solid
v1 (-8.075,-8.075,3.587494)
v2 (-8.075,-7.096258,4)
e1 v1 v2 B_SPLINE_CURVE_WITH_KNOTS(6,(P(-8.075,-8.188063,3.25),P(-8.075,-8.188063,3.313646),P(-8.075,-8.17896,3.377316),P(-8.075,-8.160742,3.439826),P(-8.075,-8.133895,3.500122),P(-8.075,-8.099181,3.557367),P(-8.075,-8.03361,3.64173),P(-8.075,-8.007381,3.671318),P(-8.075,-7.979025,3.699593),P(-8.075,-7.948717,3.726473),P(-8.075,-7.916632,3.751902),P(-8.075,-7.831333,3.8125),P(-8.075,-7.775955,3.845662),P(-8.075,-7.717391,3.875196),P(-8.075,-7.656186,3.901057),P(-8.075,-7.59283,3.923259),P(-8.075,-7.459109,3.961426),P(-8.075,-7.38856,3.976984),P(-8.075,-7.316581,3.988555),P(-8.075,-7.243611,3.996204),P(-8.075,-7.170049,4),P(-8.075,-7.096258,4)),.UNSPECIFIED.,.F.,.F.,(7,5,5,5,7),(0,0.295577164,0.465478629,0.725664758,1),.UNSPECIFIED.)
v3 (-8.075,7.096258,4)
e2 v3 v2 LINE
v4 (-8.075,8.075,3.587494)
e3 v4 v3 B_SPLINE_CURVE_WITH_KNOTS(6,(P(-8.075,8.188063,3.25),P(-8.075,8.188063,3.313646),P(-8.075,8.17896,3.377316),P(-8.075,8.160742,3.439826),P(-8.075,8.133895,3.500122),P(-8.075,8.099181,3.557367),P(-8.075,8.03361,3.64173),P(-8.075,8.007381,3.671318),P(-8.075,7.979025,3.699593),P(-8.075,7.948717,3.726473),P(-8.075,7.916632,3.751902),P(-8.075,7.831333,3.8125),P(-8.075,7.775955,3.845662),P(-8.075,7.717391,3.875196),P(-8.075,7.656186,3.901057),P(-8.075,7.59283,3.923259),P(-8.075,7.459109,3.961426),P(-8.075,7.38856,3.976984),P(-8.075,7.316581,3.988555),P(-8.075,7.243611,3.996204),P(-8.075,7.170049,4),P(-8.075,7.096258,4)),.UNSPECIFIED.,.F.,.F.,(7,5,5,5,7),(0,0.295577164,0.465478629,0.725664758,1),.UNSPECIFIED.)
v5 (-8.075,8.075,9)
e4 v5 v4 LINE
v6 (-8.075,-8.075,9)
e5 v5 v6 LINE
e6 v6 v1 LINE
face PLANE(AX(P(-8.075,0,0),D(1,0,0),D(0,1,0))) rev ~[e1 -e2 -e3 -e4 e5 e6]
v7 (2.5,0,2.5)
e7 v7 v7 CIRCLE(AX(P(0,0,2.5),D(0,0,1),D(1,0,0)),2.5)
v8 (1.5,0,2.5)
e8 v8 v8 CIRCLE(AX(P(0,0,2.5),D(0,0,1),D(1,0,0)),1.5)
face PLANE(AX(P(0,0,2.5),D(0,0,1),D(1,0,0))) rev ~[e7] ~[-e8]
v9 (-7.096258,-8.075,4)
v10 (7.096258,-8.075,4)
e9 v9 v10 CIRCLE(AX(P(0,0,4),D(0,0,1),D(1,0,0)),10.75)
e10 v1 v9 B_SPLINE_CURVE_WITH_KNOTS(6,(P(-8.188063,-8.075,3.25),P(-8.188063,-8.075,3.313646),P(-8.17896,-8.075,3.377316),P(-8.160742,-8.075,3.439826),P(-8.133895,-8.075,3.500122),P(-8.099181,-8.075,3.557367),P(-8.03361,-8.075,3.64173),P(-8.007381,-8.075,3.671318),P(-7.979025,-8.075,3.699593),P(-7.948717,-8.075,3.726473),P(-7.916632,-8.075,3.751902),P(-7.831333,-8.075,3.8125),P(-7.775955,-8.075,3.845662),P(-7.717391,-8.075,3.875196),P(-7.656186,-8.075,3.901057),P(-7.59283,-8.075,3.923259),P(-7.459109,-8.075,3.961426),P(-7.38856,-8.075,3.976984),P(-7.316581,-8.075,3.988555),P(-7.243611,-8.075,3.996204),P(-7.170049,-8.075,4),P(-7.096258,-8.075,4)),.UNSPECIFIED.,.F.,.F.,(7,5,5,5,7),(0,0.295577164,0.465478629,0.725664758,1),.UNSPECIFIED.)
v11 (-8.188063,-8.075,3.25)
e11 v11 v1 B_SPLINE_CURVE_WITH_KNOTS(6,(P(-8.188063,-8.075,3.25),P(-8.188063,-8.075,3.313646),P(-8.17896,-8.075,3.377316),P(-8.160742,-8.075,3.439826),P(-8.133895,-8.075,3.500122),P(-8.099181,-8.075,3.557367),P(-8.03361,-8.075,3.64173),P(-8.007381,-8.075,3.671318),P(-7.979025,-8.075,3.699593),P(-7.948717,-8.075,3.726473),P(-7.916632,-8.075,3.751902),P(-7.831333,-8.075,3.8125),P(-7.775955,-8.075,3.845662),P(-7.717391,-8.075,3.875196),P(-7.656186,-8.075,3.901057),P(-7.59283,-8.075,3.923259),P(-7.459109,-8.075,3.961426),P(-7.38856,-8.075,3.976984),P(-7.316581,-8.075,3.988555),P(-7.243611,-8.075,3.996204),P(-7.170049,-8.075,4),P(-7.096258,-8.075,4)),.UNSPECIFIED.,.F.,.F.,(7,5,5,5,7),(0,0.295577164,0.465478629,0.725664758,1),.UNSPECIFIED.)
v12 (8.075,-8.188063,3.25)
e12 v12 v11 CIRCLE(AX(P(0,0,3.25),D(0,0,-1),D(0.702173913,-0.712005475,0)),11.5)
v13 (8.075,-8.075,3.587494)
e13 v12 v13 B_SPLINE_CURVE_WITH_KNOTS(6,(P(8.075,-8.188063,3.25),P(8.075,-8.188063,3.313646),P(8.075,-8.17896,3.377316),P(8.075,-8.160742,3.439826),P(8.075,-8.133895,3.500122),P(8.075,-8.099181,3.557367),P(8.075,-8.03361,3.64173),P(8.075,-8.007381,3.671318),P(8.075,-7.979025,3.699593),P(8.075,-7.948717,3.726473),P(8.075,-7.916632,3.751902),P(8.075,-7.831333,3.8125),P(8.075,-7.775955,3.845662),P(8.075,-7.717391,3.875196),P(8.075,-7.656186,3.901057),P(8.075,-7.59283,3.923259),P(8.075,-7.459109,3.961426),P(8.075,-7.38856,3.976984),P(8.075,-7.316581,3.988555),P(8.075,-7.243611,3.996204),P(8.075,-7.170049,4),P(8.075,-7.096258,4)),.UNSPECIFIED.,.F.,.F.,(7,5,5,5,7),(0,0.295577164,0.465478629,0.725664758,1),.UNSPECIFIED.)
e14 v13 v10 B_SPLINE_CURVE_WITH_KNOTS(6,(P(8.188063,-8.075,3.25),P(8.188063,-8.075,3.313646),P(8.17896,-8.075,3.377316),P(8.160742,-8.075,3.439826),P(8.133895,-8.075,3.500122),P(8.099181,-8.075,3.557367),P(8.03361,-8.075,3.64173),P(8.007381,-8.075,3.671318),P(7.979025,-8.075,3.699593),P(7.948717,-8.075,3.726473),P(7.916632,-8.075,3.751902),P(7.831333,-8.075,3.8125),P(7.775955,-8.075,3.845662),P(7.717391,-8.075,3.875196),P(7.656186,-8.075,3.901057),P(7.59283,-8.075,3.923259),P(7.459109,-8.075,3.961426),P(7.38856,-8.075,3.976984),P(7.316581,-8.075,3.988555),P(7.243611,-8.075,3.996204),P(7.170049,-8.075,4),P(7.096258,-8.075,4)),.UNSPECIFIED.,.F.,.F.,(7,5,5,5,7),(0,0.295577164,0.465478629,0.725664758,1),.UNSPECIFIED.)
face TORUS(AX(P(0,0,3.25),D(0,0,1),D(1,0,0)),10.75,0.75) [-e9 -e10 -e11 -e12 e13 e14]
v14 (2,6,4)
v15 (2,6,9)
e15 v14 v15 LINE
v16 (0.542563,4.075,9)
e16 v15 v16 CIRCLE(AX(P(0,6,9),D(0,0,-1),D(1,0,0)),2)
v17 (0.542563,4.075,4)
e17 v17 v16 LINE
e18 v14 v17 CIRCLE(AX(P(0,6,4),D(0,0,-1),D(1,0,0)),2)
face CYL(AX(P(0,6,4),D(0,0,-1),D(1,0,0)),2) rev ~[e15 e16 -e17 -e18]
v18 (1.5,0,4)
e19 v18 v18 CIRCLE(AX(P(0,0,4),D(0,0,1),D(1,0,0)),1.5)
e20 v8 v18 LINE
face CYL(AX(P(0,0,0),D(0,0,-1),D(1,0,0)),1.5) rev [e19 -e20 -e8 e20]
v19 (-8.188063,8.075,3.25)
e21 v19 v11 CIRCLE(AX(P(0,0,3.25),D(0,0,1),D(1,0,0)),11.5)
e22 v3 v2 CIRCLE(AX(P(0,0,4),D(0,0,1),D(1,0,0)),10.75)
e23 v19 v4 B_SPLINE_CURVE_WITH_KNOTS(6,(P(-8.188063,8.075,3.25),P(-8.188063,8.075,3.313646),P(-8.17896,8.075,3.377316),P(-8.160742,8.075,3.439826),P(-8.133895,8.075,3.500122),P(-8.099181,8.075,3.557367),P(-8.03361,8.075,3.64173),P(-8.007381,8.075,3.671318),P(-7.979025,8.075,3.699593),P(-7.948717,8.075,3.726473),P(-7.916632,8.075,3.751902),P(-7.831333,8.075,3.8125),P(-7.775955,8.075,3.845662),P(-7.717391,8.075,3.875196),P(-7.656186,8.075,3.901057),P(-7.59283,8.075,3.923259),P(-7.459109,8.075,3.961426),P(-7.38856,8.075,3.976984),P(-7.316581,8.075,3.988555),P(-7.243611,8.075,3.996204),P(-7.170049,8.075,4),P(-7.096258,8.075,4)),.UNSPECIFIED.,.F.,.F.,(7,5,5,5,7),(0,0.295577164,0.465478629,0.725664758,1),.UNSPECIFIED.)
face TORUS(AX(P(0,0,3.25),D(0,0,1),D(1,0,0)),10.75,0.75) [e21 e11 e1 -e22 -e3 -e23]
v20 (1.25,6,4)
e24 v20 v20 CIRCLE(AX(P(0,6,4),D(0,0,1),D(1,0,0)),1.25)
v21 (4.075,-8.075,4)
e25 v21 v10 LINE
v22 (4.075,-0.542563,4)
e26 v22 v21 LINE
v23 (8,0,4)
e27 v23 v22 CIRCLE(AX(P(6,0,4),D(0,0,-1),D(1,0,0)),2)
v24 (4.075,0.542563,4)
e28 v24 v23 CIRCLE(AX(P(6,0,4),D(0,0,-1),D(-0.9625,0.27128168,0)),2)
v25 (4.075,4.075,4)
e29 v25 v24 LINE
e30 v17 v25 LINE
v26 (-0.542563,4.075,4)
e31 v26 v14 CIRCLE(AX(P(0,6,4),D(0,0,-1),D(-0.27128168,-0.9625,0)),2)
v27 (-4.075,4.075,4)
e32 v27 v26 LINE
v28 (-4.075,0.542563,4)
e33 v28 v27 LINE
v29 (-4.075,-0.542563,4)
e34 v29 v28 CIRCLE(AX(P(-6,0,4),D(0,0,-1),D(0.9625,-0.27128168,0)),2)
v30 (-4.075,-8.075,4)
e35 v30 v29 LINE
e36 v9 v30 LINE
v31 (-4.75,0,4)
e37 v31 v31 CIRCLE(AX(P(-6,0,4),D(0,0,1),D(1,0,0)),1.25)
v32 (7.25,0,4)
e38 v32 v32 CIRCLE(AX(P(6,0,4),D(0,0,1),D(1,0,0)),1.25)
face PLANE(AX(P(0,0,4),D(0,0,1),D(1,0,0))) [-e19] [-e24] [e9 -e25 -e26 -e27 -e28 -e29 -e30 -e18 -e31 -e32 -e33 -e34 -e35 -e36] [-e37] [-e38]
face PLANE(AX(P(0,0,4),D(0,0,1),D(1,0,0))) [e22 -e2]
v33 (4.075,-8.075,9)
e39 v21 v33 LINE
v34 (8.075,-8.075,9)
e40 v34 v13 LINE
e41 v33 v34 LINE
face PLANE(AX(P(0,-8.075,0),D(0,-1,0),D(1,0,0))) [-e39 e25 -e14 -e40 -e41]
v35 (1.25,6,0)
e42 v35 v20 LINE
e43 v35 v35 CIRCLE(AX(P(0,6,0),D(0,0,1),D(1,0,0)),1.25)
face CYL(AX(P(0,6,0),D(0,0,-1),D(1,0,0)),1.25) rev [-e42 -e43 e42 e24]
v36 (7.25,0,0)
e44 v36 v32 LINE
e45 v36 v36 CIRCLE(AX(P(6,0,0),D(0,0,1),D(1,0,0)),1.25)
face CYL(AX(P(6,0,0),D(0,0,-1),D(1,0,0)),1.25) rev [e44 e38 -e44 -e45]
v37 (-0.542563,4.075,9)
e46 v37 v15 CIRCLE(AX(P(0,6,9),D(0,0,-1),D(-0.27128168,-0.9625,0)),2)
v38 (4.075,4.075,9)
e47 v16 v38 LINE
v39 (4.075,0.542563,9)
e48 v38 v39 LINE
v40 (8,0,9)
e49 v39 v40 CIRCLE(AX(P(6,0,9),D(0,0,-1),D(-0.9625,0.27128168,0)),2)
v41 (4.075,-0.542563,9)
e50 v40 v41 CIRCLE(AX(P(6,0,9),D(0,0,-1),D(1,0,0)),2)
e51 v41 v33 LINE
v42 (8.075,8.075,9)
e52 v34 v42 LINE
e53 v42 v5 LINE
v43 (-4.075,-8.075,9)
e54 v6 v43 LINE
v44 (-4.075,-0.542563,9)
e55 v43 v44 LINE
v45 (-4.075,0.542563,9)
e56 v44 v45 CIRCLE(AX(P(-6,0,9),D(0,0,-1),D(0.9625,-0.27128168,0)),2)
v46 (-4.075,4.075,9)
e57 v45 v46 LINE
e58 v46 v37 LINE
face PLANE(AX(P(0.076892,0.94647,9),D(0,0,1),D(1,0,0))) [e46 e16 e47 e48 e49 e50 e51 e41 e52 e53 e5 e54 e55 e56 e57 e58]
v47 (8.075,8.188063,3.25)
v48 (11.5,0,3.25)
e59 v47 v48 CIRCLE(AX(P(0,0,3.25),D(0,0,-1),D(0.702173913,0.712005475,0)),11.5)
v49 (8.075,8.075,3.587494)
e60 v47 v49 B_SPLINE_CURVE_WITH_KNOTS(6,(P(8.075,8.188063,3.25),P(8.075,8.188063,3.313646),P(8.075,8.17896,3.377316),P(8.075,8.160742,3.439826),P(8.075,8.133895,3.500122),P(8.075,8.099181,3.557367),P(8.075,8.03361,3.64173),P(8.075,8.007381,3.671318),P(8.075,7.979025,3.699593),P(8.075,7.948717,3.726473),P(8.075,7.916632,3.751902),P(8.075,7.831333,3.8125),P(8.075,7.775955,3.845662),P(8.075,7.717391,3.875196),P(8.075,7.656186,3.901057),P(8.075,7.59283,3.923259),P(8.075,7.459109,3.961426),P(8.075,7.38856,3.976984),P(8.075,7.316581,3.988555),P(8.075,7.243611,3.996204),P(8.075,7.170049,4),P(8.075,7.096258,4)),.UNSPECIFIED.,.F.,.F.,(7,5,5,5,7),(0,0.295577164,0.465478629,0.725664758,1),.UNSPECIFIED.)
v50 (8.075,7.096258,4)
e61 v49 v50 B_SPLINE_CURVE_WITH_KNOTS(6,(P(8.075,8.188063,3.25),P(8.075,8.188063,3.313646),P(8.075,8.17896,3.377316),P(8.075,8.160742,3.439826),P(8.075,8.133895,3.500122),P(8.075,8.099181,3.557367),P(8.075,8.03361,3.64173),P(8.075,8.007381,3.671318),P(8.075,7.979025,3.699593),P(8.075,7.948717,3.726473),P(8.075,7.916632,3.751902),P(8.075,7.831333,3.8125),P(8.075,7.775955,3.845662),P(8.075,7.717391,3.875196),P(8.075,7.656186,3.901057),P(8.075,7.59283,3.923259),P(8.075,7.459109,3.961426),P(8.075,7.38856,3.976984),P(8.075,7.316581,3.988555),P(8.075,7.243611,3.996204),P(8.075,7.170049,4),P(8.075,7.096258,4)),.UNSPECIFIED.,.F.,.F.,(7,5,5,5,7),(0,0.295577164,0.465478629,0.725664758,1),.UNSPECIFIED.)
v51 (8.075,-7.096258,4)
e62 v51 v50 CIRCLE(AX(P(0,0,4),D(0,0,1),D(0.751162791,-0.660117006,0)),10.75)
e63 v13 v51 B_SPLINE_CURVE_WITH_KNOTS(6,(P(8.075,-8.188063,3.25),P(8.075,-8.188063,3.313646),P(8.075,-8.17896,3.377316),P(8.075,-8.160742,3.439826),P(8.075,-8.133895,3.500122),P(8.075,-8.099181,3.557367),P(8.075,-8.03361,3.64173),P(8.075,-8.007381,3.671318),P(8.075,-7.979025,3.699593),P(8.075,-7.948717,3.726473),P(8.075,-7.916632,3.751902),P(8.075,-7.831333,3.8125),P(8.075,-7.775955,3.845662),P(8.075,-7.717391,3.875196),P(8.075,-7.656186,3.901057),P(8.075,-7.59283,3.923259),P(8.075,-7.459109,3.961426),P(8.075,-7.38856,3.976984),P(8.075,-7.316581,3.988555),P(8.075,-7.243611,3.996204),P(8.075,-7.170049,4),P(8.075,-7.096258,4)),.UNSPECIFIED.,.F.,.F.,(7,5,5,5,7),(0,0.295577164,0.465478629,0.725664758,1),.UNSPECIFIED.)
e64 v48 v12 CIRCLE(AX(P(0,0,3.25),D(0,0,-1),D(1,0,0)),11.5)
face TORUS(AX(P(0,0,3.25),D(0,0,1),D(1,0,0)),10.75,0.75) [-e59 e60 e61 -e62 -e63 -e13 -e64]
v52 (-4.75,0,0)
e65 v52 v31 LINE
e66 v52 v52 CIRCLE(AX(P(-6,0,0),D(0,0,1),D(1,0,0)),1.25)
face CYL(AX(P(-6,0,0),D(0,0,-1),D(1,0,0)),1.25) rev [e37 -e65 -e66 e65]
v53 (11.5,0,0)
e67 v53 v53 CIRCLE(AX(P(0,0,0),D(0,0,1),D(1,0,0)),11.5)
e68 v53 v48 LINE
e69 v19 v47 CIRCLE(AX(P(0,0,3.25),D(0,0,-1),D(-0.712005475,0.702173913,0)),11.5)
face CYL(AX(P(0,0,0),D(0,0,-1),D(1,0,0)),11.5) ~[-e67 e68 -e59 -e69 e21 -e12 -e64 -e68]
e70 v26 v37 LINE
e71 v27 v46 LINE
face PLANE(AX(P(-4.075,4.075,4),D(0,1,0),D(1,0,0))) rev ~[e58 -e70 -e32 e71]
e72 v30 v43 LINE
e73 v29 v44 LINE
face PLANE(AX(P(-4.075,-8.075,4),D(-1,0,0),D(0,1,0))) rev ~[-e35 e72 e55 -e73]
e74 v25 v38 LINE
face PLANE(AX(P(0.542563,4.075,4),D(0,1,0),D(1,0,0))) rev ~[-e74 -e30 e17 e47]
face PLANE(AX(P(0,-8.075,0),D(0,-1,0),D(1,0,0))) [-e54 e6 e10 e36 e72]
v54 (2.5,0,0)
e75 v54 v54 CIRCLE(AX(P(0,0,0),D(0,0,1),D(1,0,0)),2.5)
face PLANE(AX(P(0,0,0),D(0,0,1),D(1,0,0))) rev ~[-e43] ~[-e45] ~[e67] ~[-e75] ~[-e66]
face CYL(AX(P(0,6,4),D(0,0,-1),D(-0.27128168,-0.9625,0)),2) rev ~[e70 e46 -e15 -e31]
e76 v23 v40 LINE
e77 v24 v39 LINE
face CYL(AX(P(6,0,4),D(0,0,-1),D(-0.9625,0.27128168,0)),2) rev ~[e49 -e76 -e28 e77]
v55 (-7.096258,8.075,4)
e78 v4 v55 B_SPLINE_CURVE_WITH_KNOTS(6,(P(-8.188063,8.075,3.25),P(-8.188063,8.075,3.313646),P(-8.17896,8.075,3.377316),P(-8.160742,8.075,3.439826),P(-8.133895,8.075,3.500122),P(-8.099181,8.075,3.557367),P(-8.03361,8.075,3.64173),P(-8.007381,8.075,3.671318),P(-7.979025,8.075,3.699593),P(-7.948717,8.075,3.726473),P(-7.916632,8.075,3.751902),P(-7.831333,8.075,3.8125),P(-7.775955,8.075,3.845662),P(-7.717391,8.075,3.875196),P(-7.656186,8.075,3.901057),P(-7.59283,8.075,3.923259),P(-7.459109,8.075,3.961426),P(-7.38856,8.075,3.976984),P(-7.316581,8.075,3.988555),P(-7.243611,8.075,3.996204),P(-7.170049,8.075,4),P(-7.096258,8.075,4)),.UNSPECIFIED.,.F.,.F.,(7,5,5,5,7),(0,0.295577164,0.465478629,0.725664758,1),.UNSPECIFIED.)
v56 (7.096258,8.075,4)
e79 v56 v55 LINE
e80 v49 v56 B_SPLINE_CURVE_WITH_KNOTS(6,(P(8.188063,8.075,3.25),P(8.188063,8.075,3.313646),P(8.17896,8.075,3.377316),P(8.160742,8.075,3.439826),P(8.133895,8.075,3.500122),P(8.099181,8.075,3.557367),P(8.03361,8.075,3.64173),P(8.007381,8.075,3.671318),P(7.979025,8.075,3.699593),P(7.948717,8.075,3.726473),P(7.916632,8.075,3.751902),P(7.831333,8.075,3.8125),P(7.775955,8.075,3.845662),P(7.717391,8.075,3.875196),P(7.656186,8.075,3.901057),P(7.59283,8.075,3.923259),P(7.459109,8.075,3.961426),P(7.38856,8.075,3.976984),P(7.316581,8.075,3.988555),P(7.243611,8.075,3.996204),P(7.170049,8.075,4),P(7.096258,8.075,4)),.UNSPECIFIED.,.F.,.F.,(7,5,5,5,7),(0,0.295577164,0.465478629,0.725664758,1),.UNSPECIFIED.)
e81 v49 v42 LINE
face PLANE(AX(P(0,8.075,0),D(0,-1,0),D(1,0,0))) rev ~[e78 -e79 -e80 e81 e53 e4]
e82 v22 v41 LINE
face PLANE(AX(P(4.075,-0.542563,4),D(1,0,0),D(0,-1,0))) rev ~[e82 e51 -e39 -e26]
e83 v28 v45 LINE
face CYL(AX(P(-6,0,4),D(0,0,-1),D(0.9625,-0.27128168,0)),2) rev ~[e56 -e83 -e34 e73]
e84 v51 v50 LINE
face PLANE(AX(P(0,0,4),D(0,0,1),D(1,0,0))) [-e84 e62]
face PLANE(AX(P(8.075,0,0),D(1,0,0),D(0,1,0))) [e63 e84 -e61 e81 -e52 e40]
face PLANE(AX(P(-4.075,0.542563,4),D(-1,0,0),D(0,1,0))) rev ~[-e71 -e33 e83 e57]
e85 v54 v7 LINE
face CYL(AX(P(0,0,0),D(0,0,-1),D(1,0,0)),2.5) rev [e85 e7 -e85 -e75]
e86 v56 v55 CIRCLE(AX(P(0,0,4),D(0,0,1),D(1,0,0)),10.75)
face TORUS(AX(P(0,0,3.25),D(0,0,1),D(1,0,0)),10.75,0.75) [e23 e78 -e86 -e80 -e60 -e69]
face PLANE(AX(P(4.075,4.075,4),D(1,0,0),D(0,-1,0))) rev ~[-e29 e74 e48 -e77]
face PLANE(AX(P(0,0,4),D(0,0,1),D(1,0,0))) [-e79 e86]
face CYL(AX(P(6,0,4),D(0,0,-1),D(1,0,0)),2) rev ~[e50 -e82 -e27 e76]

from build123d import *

# Parameters (mm, degrees)
F0_R     = 11.5
F0_R_2   = 1.25
F0_R_3   = 1.5
F1_DEPTH = 4
F3_DEPTH = 5
F5_R     = 2.5
F5_R_2   = 1.5
F6_DEPTH = 2.5


# Not quite as in the source:
# - a fillet or chamfer that OpenCascade refuses, or shapes differently, is made with other operations: its cross-section is extruded or revolved along the edge and cut away or added
# - a feature names something its author has since deleted; it is built from what else it names


with BuildPart() as f1:
    # F0 (on Top) → F1 (new body)
    with BuildSketch(Plane.XY):
        Circle(F0_R)
        with Locations((-6, 0)):
            Circle(F0_R_2, mode=Mode.SUBTRACT)
        Circle(F0_R_3, mode=Mode.SUBTRACT)
        with Locations((6, 0)):
            Circle(F0_R_2, mode=Mode.SUBTRACT)
        with Locations((0, 6)):
            Circle(F0_R_2, mode=Mode.SUBTRACT)
    extrude(amount=F1_DEPTH)

    # F2 (on face) → F3 (join)
    with BuildSketch(Plane.XY.offset(4)):
        with BuildLine():
            Line((0.5425633604, 4.075), (4.075, 4.075))
            Line((4.075, 4.075), (4.075, 0.5425633604))
            ThreePointArc((4.075, 0.5425633604), (6.2738612788, 1.9811612756), (8, 0))
            ThreePointArc((8, 0), (6.2738612788, -1.9811612756), (4.075, -0.5425633604))
            Line((4.075, -0.5425633604), (4.075, -4.075))
            Line((4.075, -4.075), (4.075, -8.075))
            Line((4.075, -8.075), (8.075, -8.075))
            Line((8.075, -8.075), (8.075, 8.075))
            Line((8.075, 8.075), (-8.075, 8.075))
            Line((-8.075, 8.075), (-8.075, -8.075))
            Line((-8.075, -8.075), (-4.075, -8.075))
            Line((-4.075, -8.075), (-4.075, -4.075))
            Line((-4.075, -4.075), (-4.075, -0.5425633604))
            ThreePointArc((-4.075, -0.5425633604), (-8, 0), (-4.075, 0.5425633604))
            Line((-4.075, 0.5425633604), (-4.075, 4.075))
            Line((-4.075, 4.075), (-0.5425633604, 4.075))
            ThreePointArc((-0.5425633604, 4.075), (-1.2072434053, 7.5945417399), (2, 6))
            ThreePointArc((2, 6), (1.5945417399, 4.7927565947), (0.5425633604, 4.075))
        make_face()
    extrude(amount=F3_DEPTH)

    # F4: fillet of radius 0.75 on 1 edges, made by hand


with BuildPart() as f4_tool2:
    # F4_s3 → F4_t4 (revolve)
    with BuildSketch(Plane.XZ):
        with BuildLine():
            ThreePointArc((11.5, 3.25), (11.2803300859, 3.7803300859), (10.75, 4))
            Line((10.75, 4), (11.5, 4))
            Line((11.5, 4), (11.5, 3.25))
        make_face()
    revolve(axis=Axis((0, 0, 4), (0, 0, 1)))

    split(bisect_by=Plane.YZ.offset(8.075), keep=Keep.TOP)


with BuildPart() as f1_1:
    add(f1.part)

    # F4_t1: cut F4_tool2
    add(f4_tool2.part, mode=Mode.SUBTRACT)


with BuildPart() as f4_tool7:
    # F4_s8 → F4_t9 (revolve)
    with BuildSketch(Plane.XZ):
        with BuildLine():
            ThreePointArc((11.5, 3.25), (11.2803300859, 3.7803300859), (10.75, 4))
            Line((10.75, 4), (11.5, 4))
            Line((11.5, 4), (11.5, 3.25))
        make_face()
    revolve(axis=Axis((0, 0, 4), (0, 0, 1)))

    split(bisect_by=Plane.XZ.offset(-8.075), keep=Keep.BOTTOM)


with BuildPart() as f1_2:
    add(f1_1.part)

    # F4_t6: cut F4_tool7
    add(f4_tool7.part, mode=Mode.SUBTRACT)


with BuildPart() as f4_tool12:
    # F4_s13 → F4_t14 (revolve)
    with BuildSketch(Plane.XZ):
        with BuildLine():
            ThreePointArc((11.5, 3.25), (11.2803300859, 3.7803300859), (10.75, 4))
            Line((10.75, 4), (11.5, 4))
            Line((11.5, 4), (11.5, 3.25))
        make_face()
    revolve(axis=Axis((0, 0, 4), (0, 0, 1)))

    split(bisect_by=Plane.XZ.offset(8.075), keep=Keep.TOP)


with BuildPart() as f1_3:
    add(f1_2.part)

    # F4_t11: cut F4_tool12
    add(f4_tool12.part, mode=Mode.SUBTRACT)


with BuildPart() as f4_tool17:
    # F4_s18 → F4_t19 (revolve)
    with BuildSketch(Plane.XZ):
        with BuildLine():
            ThreePointArc((11.5, 3.25), (11.2803300859, 3.7803300859), (10.75, 4))
            Line((10.75, 4), (11.5, 4))
            Line((11.5, 4), (11.5, 3.25))
        make_face()
    revolve(axis=Axis((0, 0, 4), (0, 0, 1)))

    split(bisect_by=Plane.YZ.offset(-8.075), keep=Keep.BOTTOM)


with BuildPart() as f1_4:
    add(f1_3.part)

    # F4_t16: cut F4_tool17
    add(f4_tool17.part, mode=Mode.SUBTRACT)

    # F5 (on face) → F6 (cut)
    with BuildSketch(Plane.XY):
        Circle(F5_R)
        Circle(F5_R_2, mode=Mode.SUBTRACT)
    extrude(amount=F6_DEPTH, mode=Mode.SUBTRACT)


solid = f1_4.part
